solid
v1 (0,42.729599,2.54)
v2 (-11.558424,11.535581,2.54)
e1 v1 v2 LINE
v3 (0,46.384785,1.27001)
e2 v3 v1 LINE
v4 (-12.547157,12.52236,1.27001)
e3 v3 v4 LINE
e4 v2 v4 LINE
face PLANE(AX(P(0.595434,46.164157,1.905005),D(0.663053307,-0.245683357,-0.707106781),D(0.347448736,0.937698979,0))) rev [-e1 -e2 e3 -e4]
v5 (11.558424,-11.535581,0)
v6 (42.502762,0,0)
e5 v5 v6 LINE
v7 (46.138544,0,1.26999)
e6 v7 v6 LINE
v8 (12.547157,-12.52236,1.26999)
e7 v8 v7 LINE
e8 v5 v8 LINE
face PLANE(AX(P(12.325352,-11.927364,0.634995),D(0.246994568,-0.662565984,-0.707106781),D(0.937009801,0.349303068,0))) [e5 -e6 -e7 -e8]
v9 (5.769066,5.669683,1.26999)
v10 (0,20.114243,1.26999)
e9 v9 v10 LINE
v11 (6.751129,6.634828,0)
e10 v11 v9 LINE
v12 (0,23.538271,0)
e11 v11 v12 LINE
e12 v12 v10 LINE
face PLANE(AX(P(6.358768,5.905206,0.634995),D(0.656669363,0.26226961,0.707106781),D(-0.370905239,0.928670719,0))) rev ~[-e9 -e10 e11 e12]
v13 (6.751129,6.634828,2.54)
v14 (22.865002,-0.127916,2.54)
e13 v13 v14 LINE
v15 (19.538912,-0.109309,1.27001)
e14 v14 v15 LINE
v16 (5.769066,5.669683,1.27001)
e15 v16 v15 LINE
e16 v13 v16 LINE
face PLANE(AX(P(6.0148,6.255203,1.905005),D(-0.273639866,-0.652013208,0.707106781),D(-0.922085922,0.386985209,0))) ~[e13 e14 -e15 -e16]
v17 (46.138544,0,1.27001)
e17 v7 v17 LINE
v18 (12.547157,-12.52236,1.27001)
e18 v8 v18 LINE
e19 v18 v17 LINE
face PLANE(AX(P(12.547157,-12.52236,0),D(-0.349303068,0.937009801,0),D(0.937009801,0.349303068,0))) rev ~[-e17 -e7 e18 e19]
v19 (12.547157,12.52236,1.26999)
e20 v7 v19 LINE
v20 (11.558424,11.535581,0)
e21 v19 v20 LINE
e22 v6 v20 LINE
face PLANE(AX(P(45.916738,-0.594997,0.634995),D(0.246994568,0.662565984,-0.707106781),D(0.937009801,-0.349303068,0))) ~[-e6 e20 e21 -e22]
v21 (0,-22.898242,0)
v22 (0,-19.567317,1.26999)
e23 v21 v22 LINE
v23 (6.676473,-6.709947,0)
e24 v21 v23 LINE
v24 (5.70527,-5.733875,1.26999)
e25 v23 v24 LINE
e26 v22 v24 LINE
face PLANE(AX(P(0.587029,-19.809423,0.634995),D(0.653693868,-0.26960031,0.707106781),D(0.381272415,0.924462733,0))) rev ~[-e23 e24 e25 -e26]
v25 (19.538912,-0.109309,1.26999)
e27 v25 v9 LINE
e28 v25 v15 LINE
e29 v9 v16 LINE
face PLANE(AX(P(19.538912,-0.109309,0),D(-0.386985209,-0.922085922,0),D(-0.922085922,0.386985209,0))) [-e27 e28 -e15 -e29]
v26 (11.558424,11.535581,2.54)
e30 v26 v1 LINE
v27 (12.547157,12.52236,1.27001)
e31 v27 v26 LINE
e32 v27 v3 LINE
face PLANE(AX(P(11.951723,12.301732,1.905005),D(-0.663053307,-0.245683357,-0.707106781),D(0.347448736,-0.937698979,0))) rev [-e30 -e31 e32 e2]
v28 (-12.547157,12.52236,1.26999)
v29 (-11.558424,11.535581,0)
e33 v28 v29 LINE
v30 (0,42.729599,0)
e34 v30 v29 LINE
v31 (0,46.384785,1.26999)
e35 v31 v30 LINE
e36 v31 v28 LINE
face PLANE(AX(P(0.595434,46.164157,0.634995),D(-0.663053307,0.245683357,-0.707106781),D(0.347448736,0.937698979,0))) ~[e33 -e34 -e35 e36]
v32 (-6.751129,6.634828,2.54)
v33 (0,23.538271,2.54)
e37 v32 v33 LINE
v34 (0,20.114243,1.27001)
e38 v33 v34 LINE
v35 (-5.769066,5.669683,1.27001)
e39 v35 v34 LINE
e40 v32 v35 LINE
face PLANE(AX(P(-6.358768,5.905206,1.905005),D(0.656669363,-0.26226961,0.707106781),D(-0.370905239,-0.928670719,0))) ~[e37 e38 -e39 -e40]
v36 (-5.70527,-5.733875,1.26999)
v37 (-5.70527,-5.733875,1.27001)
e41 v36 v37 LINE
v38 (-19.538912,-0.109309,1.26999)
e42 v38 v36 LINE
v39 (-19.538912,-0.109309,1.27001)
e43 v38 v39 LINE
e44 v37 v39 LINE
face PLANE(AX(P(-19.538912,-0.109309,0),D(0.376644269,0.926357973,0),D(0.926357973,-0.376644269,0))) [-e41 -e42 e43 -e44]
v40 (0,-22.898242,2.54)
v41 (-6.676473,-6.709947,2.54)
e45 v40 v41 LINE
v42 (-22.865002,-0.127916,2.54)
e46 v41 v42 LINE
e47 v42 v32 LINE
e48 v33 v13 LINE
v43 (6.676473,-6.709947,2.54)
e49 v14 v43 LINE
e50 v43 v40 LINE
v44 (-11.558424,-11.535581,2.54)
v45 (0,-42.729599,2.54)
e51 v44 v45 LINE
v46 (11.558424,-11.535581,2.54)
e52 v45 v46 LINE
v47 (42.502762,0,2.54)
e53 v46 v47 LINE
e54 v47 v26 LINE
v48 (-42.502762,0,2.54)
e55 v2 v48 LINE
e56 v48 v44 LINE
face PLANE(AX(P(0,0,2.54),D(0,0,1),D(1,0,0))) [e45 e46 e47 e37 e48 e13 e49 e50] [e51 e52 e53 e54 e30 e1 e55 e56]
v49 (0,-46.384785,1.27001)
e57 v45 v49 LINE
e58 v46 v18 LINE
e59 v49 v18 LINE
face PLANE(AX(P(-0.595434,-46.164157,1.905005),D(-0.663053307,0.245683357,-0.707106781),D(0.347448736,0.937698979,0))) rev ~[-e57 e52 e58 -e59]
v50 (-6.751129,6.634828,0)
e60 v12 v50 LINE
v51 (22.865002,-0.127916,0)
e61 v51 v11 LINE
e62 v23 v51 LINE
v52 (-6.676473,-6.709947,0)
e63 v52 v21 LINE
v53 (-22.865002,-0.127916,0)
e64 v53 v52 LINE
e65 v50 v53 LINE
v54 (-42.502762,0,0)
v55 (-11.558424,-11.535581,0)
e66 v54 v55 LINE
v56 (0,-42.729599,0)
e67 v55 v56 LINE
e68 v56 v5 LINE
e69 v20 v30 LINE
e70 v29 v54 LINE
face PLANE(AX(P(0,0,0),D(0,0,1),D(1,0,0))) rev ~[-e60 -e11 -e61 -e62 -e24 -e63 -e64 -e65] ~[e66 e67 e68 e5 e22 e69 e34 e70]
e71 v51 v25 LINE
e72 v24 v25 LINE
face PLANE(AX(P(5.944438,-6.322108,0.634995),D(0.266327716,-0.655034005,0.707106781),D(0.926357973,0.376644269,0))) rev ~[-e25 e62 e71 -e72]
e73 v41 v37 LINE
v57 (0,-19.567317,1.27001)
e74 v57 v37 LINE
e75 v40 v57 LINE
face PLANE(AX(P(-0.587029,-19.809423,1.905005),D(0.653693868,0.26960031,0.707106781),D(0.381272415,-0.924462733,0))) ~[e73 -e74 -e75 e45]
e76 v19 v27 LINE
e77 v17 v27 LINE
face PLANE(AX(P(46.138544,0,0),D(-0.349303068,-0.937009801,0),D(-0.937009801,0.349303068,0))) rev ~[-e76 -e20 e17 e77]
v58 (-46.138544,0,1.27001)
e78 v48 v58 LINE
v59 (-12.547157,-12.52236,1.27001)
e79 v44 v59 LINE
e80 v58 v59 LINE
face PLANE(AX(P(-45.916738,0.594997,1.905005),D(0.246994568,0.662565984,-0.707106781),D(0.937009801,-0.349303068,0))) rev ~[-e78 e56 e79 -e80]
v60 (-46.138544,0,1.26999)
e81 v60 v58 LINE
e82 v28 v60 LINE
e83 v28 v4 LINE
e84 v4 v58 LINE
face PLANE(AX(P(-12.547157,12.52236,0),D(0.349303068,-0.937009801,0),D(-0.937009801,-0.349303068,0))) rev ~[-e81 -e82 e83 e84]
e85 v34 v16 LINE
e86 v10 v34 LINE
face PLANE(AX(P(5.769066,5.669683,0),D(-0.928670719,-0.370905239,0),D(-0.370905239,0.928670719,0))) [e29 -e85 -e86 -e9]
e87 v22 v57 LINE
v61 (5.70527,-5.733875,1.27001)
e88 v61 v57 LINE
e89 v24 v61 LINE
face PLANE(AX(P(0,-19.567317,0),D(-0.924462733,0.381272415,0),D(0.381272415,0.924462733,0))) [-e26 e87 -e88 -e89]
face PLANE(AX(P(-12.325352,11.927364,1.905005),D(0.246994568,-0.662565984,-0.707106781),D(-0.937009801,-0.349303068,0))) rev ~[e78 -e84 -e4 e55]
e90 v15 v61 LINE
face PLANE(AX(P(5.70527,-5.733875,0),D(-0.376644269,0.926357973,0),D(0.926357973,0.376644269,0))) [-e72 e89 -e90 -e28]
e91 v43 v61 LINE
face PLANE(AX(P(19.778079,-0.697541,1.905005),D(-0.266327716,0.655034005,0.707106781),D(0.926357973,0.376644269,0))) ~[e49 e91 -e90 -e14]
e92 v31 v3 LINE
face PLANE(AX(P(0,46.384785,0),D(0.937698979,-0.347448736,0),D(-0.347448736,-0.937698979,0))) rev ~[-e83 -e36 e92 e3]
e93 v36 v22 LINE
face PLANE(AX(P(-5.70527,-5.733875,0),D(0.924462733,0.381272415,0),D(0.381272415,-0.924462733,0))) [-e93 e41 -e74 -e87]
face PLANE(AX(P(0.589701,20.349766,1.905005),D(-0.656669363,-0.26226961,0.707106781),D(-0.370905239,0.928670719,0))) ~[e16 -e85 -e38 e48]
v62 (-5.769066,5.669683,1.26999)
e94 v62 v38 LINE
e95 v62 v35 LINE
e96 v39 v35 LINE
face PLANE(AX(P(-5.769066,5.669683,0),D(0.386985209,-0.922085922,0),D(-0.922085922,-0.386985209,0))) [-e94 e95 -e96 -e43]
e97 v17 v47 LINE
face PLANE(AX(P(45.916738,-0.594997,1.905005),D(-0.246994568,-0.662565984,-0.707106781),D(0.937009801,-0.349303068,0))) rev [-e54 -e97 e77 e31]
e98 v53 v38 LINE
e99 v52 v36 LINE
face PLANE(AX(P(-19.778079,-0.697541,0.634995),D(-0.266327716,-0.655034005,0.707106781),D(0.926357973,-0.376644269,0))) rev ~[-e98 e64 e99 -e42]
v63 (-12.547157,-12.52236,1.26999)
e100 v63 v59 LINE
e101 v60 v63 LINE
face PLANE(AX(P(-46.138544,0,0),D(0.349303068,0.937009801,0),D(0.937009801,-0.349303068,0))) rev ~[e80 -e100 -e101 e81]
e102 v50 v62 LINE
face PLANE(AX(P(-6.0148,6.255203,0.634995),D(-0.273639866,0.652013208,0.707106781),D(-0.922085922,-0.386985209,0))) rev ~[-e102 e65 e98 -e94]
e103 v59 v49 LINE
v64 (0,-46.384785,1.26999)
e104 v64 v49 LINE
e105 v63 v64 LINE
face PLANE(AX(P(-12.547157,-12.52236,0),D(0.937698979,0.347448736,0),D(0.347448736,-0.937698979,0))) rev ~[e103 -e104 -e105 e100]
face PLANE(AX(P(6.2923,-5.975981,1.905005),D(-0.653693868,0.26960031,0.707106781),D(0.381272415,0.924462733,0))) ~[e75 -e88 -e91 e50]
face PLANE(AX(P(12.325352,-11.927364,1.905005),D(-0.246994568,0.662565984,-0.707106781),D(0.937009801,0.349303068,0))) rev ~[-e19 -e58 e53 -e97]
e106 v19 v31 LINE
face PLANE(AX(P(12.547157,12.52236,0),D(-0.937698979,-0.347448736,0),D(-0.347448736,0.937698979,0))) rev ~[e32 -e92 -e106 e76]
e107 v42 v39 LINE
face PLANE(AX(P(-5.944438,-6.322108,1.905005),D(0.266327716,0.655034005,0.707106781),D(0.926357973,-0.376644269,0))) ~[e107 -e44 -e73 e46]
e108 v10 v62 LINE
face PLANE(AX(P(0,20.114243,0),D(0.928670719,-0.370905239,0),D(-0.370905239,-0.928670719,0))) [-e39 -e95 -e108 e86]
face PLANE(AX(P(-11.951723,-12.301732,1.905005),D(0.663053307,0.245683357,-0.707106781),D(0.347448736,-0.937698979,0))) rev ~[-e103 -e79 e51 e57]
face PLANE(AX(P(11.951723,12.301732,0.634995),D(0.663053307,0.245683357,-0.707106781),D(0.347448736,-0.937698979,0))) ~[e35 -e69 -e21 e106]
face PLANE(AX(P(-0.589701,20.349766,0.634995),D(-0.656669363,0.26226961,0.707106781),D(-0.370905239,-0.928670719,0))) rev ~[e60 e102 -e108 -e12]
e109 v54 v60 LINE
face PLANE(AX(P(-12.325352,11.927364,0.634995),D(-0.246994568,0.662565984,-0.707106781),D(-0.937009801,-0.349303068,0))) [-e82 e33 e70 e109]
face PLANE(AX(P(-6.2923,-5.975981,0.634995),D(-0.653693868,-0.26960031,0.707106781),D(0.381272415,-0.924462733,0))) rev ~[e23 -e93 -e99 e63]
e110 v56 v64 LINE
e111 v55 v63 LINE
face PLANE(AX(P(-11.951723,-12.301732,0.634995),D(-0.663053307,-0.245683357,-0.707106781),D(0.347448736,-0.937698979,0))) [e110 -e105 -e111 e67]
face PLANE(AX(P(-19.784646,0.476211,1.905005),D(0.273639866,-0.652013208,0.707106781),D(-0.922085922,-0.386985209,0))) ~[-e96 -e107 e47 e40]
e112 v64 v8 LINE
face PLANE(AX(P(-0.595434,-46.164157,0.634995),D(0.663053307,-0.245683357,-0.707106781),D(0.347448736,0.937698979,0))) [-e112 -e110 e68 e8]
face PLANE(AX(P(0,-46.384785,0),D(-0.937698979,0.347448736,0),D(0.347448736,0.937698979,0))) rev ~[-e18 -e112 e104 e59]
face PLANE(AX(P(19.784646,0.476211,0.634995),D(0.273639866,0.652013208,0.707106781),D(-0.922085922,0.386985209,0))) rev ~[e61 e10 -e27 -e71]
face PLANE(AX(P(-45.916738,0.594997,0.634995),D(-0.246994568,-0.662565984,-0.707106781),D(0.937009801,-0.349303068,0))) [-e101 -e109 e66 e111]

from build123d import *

# Parameters (mm, degrees)
F2_DEPTH = 2.54
F3_DEPTH = 23.622
F4_SIZE  = 1.26999


# Not quite as in the source:
# - a fillet or chamfer is up to 0.001 mm smaller than in the source, because OpenCascade refuses the exact size


with BuildPart() as f2:
    # F0 (on Top) → F2 (new body)
    with BuildSketch(Plane.XY):
        Polygon((12.5471574406, 12.5223604022), (0, 46.3847853243), (-12.5471574406, 12.5223604022), (-46.1385440799, 0), (-12.5471574406, -12.5223604022), (0, -46.3847853243), (12.5471574406, -12.5223604022), (46.1385440799, 0), align=None)
    extrude(amount=F2_DEPTH)

    # F1 (on Top) → F3 (cut)
    with BuildSketch(Plane.XY):
        Polygon((5.7690664033, 5.6696828615), (0, 20.1142430305), (-5.7690664033, 5.6696828615), (-19.5389121215, -0.109308556), (-5.705270301, -5.7338749296), (0, -19.5673167638), (5.705270301, -5.7338749296), (19.5389121215, -0.109308556), align=None)
    extrude(amount=F3_DEPTH, mode=Mode.SUBTRACT)

    # F4 (size 1.27 in the source; OpenCascade refuses exactly that, so slightly less here)
    f4_edges = [f2.edges().sort_by_distance(p)[0] for p in [
        (6.273579, -29.453573, 2.54),
        (-6.273579, -29.453573, 2.54),
        (-29.342851, -6.26118, 2.54),
        (-29.342851, 6.26118, 2.54),
        (-6.273579, 29.453573, 2.54),
        (6.273579, 29.453573, 2.54),
        (29.342851, 6.26118, 2.54),
        (29.342851, -6.26118, 2.54),
        (-6.273579, 29.453573, 0),
        (29.342851, 6.26118, 0),
        (6.273579, 29.453573, 0),
        (29.342851, -6.26118, 0),
        (6.273579, -29.453573, 0),
        (-6.273579, -29.453573, 0),
        (-29.342851, -6.26118, 0),
        (-29.342851, 6.26118, 0),
        (-12.653989, 2.780187, 0),
        (12.653989, 2.780187, 2.54),
        (2.884533, 12.891963, 2.54),
        (-2.884533, 12.891963, 2.54),
        (-12.653989, 2.780187, 2.54),
        (-12.622091, -2.921592, 2.54),
        (-2.852635, -12.650596, 2.54),
        (2.852635, -12.650596, 2.54),
        (12.622091, -2.921592, 2.54),
        (-12.622091, -2.921592, 0),
        (-2.852635, -12.650596, 0),
        (2.852635, -12.650596, 0),
        (12.622091, -2.921592, 0),
        (12.653989, 2.780187, 0),
        (2.884533, 12.891963, 0),
        (-2.884533, 12.891963, 0),
    ]]
    chamfer(f4_edges, length=F4_SIZE)


solid = f2.part
